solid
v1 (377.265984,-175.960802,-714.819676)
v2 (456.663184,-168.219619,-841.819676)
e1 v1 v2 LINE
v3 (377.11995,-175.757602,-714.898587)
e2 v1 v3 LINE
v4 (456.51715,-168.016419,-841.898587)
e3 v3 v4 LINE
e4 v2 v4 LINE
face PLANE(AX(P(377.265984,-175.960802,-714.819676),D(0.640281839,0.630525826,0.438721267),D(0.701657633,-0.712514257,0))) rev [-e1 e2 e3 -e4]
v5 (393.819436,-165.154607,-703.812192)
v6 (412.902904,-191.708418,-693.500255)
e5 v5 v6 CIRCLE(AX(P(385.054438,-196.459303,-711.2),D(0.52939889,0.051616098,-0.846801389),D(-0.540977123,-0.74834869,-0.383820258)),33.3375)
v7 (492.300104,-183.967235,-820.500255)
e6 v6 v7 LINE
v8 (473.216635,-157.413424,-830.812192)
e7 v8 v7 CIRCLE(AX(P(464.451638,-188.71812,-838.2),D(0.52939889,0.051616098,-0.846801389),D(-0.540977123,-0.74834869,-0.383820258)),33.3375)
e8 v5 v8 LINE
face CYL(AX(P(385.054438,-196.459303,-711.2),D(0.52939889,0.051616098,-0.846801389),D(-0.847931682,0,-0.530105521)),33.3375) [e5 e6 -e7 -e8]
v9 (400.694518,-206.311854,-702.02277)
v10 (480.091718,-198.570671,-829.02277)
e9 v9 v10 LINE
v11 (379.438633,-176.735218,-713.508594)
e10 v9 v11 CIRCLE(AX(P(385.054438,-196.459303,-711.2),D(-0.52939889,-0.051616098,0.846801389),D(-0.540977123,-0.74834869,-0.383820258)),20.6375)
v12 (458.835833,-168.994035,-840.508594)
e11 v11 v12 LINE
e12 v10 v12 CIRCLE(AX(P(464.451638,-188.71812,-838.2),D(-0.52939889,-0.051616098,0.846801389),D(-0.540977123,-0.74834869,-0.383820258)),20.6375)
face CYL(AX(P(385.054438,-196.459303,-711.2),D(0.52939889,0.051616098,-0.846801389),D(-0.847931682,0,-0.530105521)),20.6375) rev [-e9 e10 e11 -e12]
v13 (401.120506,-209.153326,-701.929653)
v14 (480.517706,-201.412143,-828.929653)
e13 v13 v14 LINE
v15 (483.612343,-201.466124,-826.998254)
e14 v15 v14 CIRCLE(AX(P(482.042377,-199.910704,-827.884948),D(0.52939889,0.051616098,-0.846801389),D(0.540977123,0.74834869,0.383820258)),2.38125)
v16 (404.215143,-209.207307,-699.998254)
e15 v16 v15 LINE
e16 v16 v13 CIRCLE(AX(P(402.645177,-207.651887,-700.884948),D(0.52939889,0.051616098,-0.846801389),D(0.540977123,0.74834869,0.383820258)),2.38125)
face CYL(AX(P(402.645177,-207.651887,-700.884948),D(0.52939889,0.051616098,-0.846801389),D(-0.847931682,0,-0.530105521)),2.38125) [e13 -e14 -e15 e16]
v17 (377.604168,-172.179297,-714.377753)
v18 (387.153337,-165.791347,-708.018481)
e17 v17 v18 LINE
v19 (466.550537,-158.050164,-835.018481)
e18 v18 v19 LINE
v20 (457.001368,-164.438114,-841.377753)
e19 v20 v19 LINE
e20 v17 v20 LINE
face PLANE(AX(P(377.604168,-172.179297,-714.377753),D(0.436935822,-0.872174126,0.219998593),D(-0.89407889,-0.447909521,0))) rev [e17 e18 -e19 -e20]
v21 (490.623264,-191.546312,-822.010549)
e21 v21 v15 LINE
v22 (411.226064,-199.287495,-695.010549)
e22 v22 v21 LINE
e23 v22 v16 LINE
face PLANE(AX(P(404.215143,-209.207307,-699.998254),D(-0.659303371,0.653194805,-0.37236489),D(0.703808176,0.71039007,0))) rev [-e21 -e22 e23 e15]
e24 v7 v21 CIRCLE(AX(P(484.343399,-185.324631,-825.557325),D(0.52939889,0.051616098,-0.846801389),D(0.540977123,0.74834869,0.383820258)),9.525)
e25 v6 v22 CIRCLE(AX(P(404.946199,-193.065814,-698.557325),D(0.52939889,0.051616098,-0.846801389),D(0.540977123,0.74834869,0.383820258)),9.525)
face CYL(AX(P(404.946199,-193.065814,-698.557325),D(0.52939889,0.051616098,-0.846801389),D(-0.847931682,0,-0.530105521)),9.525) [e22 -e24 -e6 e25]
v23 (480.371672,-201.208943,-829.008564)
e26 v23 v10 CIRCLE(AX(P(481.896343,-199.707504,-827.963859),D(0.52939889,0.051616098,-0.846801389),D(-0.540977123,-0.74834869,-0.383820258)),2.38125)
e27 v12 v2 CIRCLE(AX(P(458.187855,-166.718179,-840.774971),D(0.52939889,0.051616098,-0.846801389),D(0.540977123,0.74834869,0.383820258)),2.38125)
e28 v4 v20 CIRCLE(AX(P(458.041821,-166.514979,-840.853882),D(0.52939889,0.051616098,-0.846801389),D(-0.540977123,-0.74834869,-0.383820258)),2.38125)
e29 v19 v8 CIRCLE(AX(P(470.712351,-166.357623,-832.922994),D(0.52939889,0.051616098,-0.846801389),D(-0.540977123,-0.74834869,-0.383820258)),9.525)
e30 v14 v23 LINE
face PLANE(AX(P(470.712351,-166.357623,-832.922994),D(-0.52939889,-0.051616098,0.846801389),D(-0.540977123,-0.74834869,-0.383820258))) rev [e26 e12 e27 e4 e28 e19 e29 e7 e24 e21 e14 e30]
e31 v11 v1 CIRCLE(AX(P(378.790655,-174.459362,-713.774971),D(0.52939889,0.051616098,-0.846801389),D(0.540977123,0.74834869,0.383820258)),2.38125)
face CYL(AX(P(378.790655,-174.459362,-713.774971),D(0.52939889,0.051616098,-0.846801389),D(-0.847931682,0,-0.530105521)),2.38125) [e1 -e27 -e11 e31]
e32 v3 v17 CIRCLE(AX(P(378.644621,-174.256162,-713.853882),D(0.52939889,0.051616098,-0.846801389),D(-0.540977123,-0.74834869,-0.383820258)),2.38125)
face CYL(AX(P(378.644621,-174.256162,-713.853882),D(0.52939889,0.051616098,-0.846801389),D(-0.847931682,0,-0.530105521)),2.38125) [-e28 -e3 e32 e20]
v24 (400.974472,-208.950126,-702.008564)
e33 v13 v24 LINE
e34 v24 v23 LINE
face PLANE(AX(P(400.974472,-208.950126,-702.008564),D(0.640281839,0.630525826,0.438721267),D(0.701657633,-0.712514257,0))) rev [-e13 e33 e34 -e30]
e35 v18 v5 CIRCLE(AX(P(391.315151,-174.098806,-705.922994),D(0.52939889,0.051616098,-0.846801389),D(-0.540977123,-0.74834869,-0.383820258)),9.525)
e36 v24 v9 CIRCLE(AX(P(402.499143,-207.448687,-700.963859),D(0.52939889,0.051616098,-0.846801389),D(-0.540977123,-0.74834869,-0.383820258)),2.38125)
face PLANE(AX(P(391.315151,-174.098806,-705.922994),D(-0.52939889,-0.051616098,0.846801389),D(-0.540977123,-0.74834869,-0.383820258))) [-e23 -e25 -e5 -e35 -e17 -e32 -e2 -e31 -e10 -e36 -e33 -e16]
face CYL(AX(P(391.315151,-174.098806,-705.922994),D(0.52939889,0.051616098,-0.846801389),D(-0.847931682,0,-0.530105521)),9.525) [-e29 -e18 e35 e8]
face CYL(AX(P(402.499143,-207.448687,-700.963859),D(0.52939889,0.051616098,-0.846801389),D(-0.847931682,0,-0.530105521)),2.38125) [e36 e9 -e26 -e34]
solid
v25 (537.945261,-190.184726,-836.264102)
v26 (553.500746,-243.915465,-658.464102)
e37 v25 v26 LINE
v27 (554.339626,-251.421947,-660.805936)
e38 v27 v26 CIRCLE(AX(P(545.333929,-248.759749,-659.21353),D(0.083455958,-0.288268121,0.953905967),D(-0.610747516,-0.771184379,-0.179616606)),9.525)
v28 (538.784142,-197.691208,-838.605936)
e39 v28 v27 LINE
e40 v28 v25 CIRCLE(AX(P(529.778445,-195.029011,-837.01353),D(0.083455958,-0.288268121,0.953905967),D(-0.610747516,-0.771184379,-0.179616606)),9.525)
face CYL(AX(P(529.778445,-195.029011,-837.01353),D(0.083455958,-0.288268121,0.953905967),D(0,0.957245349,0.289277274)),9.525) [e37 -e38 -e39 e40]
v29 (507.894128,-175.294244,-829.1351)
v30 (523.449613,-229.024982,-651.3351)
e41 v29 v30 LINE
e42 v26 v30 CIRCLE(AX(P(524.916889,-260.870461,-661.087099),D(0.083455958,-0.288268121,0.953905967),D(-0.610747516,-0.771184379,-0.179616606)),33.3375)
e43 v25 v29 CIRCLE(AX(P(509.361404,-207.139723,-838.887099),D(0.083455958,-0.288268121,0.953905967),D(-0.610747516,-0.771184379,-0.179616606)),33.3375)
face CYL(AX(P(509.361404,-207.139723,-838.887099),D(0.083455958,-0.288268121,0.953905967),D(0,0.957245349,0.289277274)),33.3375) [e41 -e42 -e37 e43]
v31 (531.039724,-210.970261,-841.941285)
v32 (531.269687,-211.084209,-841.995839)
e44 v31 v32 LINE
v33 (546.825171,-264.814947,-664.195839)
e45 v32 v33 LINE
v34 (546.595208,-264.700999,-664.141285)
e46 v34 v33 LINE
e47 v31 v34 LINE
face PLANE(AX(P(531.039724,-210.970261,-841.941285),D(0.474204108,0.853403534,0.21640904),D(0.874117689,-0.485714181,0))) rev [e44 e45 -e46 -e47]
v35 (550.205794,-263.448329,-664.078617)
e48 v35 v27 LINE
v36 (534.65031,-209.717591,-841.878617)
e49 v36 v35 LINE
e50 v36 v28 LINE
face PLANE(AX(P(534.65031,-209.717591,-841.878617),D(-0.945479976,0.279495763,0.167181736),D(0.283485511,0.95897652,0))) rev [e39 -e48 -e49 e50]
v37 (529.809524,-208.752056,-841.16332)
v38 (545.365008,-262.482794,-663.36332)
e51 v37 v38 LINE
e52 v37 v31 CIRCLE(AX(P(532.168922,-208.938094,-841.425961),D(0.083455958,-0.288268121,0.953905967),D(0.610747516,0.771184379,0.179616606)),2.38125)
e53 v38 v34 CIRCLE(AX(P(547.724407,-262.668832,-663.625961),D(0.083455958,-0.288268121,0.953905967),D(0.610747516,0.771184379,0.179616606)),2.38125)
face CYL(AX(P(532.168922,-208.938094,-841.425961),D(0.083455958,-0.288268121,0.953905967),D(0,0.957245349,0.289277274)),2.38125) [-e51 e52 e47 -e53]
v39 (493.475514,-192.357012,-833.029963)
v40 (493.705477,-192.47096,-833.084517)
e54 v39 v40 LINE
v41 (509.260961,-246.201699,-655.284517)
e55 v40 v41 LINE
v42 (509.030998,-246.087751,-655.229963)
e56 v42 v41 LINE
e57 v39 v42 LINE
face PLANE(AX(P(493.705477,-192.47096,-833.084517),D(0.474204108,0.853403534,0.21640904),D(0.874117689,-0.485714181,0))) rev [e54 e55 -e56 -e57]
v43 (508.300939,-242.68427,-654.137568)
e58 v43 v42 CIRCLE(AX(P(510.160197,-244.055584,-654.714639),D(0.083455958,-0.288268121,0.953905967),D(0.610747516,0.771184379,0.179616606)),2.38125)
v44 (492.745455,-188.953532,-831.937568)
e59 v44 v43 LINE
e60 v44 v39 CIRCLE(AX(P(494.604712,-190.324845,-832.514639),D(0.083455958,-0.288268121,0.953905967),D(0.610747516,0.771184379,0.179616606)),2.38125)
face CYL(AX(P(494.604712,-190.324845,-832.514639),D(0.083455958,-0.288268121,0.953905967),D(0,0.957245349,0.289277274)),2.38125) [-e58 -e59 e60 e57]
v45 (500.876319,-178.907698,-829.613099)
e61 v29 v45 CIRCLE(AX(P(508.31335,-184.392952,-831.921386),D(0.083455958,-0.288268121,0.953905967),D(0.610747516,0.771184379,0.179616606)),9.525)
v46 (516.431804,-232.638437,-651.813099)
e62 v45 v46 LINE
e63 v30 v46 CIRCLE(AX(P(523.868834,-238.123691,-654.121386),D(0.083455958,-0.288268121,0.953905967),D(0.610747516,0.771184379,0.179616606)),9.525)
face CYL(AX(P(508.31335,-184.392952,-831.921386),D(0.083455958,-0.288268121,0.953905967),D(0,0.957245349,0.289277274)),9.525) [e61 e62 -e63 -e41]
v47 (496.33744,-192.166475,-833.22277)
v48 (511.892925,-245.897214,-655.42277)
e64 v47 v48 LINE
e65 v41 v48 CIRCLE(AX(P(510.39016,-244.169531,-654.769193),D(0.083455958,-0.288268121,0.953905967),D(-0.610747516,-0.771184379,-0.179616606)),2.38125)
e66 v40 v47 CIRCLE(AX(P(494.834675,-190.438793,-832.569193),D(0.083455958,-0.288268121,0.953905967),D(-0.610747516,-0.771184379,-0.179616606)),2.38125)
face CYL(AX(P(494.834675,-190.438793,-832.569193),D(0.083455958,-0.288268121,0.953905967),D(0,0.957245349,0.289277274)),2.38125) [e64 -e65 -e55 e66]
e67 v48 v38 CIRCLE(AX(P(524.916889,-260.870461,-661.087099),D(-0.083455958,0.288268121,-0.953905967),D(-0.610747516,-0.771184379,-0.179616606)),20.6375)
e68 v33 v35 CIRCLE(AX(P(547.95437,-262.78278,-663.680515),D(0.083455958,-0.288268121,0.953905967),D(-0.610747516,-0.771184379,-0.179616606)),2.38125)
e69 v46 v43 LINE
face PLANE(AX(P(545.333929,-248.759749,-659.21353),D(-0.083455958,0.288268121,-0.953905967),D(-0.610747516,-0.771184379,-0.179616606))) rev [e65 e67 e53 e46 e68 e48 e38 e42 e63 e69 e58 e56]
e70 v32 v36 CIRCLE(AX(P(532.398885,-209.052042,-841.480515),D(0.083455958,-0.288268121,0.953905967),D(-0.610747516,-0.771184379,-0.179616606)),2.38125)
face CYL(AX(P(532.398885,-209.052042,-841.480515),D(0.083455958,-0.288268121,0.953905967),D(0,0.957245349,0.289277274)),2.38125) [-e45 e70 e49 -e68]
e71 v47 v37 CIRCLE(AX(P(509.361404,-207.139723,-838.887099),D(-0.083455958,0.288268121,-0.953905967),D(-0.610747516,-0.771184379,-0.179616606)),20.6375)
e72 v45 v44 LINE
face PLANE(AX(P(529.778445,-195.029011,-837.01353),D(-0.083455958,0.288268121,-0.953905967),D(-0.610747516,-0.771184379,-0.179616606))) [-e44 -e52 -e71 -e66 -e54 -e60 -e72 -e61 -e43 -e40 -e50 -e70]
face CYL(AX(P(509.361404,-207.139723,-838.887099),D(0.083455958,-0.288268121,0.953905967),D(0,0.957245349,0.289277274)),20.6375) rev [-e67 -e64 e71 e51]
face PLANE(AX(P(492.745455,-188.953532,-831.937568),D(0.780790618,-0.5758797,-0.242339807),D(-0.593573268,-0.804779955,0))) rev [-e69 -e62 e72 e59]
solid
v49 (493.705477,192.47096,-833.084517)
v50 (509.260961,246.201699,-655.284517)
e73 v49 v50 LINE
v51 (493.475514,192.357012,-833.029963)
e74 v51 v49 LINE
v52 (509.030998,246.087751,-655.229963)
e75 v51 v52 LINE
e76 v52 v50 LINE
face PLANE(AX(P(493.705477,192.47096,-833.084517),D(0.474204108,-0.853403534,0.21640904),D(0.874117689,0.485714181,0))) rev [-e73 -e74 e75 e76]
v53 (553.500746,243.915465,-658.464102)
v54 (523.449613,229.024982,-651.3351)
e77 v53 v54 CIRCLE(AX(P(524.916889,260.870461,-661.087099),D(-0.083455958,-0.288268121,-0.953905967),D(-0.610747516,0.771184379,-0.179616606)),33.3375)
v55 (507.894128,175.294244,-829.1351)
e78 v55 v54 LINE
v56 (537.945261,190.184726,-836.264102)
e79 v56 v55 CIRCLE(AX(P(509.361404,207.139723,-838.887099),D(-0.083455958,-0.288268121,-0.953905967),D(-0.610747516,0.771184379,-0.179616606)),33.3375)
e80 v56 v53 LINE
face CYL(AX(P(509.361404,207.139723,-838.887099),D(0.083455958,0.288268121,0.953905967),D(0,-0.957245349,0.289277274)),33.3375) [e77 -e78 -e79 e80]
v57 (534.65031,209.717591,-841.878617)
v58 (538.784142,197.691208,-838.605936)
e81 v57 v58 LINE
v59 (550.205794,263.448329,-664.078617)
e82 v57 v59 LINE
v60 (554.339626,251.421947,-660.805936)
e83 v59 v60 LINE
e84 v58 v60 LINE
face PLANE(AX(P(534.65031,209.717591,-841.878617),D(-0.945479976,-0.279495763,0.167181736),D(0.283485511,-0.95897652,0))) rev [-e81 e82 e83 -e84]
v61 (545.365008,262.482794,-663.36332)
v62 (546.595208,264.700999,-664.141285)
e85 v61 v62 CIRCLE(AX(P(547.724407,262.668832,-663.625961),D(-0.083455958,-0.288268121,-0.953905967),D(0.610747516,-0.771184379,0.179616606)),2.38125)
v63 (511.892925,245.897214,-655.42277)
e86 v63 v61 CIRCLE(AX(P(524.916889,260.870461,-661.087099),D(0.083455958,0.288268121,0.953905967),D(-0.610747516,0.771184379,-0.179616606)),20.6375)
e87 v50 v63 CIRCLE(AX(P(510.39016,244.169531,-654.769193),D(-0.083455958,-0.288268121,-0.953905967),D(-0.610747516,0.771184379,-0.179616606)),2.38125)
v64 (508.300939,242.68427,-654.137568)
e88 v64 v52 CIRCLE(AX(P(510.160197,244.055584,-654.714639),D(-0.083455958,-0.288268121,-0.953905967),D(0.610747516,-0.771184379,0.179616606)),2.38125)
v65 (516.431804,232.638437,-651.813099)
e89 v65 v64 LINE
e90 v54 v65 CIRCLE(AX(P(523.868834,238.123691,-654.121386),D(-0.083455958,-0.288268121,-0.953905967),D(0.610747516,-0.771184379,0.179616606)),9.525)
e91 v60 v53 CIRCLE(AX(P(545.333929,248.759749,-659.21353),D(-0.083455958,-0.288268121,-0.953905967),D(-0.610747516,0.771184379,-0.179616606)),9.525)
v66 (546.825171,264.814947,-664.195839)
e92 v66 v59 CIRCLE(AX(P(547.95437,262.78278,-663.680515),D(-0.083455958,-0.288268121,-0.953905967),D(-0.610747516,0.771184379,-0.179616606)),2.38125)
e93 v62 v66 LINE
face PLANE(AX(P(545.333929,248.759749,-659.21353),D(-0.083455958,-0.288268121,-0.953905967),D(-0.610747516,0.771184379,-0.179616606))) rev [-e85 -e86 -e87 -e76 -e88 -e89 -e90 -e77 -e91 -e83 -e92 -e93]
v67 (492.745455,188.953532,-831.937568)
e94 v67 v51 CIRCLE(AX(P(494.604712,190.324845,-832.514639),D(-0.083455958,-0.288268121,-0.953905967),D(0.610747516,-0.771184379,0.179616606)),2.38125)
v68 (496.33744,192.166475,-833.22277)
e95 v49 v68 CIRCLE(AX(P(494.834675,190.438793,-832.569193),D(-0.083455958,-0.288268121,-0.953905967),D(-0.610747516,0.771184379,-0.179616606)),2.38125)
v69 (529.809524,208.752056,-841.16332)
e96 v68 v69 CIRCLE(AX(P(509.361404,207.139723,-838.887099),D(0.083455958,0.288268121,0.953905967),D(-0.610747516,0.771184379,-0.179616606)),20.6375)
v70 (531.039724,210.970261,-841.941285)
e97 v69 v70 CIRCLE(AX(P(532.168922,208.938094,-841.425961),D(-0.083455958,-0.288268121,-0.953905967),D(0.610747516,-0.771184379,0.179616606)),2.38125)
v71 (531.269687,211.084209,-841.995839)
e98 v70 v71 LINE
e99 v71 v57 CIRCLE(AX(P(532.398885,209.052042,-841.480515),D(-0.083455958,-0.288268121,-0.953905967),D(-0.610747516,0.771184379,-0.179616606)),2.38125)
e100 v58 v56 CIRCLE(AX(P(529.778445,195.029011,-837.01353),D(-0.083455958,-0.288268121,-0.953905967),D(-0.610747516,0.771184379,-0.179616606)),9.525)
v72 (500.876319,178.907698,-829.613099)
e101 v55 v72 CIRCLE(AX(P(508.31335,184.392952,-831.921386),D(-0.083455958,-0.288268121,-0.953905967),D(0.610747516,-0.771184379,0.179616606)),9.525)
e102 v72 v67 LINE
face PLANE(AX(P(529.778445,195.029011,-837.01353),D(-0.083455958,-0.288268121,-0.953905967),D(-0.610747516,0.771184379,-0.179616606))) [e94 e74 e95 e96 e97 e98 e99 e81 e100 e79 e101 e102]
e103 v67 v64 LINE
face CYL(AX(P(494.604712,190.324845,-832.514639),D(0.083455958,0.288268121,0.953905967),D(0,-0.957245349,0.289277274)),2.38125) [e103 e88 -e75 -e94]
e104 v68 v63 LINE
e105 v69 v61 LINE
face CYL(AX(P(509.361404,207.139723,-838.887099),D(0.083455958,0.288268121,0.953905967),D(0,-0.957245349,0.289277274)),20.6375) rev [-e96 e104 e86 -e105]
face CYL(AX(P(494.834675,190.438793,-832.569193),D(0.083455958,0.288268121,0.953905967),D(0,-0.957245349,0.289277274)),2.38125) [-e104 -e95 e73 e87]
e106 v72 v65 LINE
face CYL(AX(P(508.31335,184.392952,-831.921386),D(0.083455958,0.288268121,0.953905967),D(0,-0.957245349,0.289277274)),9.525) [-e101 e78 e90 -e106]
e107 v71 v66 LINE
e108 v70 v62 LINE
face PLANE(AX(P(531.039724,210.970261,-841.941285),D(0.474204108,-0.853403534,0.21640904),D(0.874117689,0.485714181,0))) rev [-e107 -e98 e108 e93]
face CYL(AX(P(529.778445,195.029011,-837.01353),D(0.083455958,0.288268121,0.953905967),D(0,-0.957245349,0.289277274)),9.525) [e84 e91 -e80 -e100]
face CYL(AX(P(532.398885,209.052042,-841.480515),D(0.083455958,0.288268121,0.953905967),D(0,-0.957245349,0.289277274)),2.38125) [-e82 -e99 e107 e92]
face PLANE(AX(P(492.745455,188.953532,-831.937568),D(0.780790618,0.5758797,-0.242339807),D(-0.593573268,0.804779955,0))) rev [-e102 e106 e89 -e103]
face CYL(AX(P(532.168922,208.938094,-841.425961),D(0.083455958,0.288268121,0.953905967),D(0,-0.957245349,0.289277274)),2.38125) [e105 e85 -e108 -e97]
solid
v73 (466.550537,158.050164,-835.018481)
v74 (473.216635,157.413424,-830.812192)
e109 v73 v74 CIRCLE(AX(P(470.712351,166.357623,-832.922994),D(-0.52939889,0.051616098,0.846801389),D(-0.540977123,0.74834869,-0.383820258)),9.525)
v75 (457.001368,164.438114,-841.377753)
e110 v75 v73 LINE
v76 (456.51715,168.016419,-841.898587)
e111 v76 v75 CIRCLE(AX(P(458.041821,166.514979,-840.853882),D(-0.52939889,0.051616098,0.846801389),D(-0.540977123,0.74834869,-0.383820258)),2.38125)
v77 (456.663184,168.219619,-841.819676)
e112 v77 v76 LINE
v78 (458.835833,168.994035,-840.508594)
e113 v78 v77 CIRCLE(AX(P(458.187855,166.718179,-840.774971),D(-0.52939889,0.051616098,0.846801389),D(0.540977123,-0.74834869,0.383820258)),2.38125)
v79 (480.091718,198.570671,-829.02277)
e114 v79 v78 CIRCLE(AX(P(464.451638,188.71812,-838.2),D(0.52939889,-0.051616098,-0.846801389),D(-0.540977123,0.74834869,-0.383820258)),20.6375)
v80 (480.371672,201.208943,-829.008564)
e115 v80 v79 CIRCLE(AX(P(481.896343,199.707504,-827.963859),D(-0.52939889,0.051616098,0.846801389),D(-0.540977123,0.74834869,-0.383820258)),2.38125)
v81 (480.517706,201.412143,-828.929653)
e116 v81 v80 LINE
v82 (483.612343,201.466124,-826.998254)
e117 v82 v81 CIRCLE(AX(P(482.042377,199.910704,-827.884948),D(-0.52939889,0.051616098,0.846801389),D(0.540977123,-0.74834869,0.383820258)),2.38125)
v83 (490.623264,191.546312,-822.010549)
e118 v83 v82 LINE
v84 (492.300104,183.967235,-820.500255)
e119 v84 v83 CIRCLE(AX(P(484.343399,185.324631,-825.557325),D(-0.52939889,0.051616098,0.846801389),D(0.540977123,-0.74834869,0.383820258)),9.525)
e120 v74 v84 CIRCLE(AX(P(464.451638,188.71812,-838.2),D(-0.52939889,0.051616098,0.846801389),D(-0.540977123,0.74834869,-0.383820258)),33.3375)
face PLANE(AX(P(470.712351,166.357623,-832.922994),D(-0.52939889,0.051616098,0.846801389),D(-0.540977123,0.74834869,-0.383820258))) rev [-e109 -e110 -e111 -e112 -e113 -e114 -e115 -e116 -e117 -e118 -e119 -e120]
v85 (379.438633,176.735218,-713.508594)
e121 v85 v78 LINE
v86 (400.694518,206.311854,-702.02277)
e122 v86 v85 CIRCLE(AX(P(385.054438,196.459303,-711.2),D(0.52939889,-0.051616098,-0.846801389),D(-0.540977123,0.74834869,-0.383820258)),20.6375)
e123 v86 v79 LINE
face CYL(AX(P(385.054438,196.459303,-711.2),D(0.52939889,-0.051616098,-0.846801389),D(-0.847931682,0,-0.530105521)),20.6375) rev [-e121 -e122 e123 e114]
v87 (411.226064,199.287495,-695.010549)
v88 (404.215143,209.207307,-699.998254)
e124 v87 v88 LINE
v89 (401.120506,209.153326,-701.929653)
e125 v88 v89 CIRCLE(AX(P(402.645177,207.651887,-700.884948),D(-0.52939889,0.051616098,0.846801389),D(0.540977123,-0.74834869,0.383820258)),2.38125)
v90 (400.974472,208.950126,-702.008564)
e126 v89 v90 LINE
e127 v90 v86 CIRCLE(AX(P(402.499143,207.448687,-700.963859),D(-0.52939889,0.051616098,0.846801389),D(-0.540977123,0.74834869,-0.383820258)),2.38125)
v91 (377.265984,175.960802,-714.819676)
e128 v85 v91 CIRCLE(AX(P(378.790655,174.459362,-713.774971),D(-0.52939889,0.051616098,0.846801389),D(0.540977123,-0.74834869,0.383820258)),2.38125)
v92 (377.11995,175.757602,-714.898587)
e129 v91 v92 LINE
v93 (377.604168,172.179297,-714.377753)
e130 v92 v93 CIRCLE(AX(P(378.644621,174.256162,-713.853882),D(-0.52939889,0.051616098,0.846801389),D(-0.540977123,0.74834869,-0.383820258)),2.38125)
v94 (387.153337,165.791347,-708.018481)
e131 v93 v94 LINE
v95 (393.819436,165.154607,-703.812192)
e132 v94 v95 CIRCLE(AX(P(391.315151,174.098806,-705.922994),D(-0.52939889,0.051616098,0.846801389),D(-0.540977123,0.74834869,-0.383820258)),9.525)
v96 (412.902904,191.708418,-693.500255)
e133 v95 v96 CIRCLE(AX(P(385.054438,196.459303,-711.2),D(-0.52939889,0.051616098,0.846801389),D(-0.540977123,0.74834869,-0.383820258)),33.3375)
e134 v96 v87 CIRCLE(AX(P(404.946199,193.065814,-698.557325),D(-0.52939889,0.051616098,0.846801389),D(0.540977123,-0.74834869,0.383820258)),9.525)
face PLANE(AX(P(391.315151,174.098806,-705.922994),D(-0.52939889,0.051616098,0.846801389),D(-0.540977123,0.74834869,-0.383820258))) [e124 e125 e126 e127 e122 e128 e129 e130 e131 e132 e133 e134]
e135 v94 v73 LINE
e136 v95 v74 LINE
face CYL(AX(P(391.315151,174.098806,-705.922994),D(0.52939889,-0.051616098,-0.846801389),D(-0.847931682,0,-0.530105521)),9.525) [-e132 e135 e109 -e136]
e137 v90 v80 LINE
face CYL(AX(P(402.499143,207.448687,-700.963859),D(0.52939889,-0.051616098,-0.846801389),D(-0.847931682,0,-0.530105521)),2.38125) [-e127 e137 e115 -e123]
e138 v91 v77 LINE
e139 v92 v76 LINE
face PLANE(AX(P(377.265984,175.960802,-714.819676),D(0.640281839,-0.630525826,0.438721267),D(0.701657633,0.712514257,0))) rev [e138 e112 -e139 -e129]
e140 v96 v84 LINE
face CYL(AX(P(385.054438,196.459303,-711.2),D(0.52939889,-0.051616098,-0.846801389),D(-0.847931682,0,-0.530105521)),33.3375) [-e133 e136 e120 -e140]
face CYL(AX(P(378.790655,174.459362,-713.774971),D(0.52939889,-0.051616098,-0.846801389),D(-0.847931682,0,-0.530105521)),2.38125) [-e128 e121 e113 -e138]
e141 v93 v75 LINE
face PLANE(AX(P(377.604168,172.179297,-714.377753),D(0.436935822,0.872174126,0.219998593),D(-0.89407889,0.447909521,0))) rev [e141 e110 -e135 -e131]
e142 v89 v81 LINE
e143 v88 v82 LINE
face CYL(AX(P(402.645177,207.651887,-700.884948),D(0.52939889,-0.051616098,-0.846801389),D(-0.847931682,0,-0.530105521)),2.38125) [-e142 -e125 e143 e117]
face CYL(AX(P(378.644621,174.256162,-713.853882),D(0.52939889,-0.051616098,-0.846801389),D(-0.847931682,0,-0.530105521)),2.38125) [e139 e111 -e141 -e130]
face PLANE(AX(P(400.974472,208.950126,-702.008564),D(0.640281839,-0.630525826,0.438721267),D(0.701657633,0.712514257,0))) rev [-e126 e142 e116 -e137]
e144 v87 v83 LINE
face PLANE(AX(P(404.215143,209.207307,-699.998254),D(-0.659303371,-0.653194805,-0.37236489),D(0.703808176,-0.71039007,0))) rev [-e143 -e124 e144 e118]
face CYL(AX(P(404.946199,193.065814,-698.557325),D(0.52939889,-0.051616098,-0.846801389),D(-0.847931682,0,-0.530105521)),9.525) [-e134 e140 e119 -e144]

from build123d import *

# Parameters (mm, degrees)
STRUCTURAL_START           = 795.952077949
STRUCTURAL_MEMBER3_DEPTH   = 149.976135589
STRUCTURAL_START_2         = -697.998386167
STRUCTURAL_MEMBER3_2_DEPTH = 186.391537724


# Read off the part's stored shape, not the designer's step: Structural Member3
with BuildPart() as part:
    # Structural Member3 outline → Structural Member3 (new body)
    with BuildSketch(Plane(origin=(0, 0, 0), x_dir=(0.8483730398559017, 0.03220930397512309, 0.528418154479097), z_dir=(0.5293988904839683, -0.05161609821289462, -0.8468013894412433)).offset(STRUCTURAL_START)):
        with BuildLine():
            ThreePointArc((-9.987638451, -233.546710042), (-17.652980521, -217.494597975), (-32.481832864, -207.66948174))
            ThreePointArc((-32.481832864, -207.66948174), (-36.507474456, -207.261253054), (-40.339341683, -208.560958573))
            Line((-40.339341683, -208.560958573), (-51.595202921, -215.323981259))
            ThreePointArc((-51.595202921, -215.323981259), (-52.720721088, -216.992588021), (-52.165963282, -218.927344711))
            Line((-52.165963282, -218.927344711), (-51.993828977, -219.125367305))
            ThreePointArc((-51.993828977, -219.125367305), (-50.818836781, -219.861679152), (-49.432869841, -219.818581138))
            ThreePointArc((-49.432869841, -219.818581138), (-27.237890667, -225.826434358), (-24.377988855, -248.641612693))
            ThreePointArc((-24.377988855, -248.641612693), (-24.61358906, -250.008087845), (-24.048000184, -251.274133271))
            Line((-24.048000184, -251.274133271), (-23.875865879, -251.472155864))
            ThreePointArc((-23.875865879, -251.472155864), (-22.037164824, -252.290824358), (-20.228134118, -251.408527596))
            Line((-20.228134118, -251.408527596), (-11.96417436, -241.203633809))
            ThreePointArc((-11.96417436, -241.203633809), (-10.14373922, -237.589985129), (-9.987638451, -233.546710042))
        make_face()
    extrude(amount=STRUCTURAL_MEMBER3_DEPTH)


with BuildPart() as body_2:
    # Structural Member3 2 outline → Structural Member3 2 (new body)
    with BuildSketch(Plane(origin=(0, 0, 0), x_dir=(0.9965114665905763, -0.024141912103041747, -0.0798878278181833), z_dir=(0.08345595816656048, 0.2882681208702779, 0.9539059668208498)).offset(STRUCTURAL_START_2)):
        with BuildLine():
            ThreePointArc((568.128186494, 407.649541721), (585.464720991, 411.633552573), (598.284520868, 423.965644933))
            ThreePointArc((598.284520868, 423.965644933), (599.559991632, 427.805646914), (599.126338057, 431.828629074))
            Line((599.126338057, 431.828629074), (594.978034465, 444.287540157))
            ThreePointArc((594.978034465, 444.287540157), (593.594721137, 445.749553805), (591.585577038, 445.629638576))
            Line((591.585577038, 445.629638576), (591.354809064, 445.504781422))
            ThreePointArc((591.354809064, 445.504781422), (590.380194098, 444.518430843), (590.120302536, 443.156366905))
            ThreePointArc((590.120302536, 443.156366905), (579.421245957, 422.803441091), (556.531041464, 424.982876598))
            ThreePointArc((556.531041464, 424.982876598), (555.248719811, 425.51052513), (553.889864023, 425.234349926))
            Line((553.889864023, 425.234349926), (553.659096048, 425.109492772))
            ThreePointArc((553.659096048, 425.109492772), (552.459503511, 423.493319076), (552.92648117, 421.535521452))
            Line((552.92648117, 421.535521452), (561.085809999, 411.246778034))
            ThreePointArc((561.085809999, 411.246778034), (564.216044632, 408.682782709), (568.128186494, 407.649541721))
        make_face()
    extrude(amount=STRUCTURAL_MEMBER3_2_DEPTH)


with BuildPart() as body_3:
    # Mirror1: mirrored copy
    add(body_2.part.mirror(Plane.ZX))


with BuildPart() as body_4:
    # Mirror1 2: mirrored copy
    add(part.part.mirror(Plane.ZX))


solid = Compound([part.part, body_2.part, body_3.part, body_4.part])
